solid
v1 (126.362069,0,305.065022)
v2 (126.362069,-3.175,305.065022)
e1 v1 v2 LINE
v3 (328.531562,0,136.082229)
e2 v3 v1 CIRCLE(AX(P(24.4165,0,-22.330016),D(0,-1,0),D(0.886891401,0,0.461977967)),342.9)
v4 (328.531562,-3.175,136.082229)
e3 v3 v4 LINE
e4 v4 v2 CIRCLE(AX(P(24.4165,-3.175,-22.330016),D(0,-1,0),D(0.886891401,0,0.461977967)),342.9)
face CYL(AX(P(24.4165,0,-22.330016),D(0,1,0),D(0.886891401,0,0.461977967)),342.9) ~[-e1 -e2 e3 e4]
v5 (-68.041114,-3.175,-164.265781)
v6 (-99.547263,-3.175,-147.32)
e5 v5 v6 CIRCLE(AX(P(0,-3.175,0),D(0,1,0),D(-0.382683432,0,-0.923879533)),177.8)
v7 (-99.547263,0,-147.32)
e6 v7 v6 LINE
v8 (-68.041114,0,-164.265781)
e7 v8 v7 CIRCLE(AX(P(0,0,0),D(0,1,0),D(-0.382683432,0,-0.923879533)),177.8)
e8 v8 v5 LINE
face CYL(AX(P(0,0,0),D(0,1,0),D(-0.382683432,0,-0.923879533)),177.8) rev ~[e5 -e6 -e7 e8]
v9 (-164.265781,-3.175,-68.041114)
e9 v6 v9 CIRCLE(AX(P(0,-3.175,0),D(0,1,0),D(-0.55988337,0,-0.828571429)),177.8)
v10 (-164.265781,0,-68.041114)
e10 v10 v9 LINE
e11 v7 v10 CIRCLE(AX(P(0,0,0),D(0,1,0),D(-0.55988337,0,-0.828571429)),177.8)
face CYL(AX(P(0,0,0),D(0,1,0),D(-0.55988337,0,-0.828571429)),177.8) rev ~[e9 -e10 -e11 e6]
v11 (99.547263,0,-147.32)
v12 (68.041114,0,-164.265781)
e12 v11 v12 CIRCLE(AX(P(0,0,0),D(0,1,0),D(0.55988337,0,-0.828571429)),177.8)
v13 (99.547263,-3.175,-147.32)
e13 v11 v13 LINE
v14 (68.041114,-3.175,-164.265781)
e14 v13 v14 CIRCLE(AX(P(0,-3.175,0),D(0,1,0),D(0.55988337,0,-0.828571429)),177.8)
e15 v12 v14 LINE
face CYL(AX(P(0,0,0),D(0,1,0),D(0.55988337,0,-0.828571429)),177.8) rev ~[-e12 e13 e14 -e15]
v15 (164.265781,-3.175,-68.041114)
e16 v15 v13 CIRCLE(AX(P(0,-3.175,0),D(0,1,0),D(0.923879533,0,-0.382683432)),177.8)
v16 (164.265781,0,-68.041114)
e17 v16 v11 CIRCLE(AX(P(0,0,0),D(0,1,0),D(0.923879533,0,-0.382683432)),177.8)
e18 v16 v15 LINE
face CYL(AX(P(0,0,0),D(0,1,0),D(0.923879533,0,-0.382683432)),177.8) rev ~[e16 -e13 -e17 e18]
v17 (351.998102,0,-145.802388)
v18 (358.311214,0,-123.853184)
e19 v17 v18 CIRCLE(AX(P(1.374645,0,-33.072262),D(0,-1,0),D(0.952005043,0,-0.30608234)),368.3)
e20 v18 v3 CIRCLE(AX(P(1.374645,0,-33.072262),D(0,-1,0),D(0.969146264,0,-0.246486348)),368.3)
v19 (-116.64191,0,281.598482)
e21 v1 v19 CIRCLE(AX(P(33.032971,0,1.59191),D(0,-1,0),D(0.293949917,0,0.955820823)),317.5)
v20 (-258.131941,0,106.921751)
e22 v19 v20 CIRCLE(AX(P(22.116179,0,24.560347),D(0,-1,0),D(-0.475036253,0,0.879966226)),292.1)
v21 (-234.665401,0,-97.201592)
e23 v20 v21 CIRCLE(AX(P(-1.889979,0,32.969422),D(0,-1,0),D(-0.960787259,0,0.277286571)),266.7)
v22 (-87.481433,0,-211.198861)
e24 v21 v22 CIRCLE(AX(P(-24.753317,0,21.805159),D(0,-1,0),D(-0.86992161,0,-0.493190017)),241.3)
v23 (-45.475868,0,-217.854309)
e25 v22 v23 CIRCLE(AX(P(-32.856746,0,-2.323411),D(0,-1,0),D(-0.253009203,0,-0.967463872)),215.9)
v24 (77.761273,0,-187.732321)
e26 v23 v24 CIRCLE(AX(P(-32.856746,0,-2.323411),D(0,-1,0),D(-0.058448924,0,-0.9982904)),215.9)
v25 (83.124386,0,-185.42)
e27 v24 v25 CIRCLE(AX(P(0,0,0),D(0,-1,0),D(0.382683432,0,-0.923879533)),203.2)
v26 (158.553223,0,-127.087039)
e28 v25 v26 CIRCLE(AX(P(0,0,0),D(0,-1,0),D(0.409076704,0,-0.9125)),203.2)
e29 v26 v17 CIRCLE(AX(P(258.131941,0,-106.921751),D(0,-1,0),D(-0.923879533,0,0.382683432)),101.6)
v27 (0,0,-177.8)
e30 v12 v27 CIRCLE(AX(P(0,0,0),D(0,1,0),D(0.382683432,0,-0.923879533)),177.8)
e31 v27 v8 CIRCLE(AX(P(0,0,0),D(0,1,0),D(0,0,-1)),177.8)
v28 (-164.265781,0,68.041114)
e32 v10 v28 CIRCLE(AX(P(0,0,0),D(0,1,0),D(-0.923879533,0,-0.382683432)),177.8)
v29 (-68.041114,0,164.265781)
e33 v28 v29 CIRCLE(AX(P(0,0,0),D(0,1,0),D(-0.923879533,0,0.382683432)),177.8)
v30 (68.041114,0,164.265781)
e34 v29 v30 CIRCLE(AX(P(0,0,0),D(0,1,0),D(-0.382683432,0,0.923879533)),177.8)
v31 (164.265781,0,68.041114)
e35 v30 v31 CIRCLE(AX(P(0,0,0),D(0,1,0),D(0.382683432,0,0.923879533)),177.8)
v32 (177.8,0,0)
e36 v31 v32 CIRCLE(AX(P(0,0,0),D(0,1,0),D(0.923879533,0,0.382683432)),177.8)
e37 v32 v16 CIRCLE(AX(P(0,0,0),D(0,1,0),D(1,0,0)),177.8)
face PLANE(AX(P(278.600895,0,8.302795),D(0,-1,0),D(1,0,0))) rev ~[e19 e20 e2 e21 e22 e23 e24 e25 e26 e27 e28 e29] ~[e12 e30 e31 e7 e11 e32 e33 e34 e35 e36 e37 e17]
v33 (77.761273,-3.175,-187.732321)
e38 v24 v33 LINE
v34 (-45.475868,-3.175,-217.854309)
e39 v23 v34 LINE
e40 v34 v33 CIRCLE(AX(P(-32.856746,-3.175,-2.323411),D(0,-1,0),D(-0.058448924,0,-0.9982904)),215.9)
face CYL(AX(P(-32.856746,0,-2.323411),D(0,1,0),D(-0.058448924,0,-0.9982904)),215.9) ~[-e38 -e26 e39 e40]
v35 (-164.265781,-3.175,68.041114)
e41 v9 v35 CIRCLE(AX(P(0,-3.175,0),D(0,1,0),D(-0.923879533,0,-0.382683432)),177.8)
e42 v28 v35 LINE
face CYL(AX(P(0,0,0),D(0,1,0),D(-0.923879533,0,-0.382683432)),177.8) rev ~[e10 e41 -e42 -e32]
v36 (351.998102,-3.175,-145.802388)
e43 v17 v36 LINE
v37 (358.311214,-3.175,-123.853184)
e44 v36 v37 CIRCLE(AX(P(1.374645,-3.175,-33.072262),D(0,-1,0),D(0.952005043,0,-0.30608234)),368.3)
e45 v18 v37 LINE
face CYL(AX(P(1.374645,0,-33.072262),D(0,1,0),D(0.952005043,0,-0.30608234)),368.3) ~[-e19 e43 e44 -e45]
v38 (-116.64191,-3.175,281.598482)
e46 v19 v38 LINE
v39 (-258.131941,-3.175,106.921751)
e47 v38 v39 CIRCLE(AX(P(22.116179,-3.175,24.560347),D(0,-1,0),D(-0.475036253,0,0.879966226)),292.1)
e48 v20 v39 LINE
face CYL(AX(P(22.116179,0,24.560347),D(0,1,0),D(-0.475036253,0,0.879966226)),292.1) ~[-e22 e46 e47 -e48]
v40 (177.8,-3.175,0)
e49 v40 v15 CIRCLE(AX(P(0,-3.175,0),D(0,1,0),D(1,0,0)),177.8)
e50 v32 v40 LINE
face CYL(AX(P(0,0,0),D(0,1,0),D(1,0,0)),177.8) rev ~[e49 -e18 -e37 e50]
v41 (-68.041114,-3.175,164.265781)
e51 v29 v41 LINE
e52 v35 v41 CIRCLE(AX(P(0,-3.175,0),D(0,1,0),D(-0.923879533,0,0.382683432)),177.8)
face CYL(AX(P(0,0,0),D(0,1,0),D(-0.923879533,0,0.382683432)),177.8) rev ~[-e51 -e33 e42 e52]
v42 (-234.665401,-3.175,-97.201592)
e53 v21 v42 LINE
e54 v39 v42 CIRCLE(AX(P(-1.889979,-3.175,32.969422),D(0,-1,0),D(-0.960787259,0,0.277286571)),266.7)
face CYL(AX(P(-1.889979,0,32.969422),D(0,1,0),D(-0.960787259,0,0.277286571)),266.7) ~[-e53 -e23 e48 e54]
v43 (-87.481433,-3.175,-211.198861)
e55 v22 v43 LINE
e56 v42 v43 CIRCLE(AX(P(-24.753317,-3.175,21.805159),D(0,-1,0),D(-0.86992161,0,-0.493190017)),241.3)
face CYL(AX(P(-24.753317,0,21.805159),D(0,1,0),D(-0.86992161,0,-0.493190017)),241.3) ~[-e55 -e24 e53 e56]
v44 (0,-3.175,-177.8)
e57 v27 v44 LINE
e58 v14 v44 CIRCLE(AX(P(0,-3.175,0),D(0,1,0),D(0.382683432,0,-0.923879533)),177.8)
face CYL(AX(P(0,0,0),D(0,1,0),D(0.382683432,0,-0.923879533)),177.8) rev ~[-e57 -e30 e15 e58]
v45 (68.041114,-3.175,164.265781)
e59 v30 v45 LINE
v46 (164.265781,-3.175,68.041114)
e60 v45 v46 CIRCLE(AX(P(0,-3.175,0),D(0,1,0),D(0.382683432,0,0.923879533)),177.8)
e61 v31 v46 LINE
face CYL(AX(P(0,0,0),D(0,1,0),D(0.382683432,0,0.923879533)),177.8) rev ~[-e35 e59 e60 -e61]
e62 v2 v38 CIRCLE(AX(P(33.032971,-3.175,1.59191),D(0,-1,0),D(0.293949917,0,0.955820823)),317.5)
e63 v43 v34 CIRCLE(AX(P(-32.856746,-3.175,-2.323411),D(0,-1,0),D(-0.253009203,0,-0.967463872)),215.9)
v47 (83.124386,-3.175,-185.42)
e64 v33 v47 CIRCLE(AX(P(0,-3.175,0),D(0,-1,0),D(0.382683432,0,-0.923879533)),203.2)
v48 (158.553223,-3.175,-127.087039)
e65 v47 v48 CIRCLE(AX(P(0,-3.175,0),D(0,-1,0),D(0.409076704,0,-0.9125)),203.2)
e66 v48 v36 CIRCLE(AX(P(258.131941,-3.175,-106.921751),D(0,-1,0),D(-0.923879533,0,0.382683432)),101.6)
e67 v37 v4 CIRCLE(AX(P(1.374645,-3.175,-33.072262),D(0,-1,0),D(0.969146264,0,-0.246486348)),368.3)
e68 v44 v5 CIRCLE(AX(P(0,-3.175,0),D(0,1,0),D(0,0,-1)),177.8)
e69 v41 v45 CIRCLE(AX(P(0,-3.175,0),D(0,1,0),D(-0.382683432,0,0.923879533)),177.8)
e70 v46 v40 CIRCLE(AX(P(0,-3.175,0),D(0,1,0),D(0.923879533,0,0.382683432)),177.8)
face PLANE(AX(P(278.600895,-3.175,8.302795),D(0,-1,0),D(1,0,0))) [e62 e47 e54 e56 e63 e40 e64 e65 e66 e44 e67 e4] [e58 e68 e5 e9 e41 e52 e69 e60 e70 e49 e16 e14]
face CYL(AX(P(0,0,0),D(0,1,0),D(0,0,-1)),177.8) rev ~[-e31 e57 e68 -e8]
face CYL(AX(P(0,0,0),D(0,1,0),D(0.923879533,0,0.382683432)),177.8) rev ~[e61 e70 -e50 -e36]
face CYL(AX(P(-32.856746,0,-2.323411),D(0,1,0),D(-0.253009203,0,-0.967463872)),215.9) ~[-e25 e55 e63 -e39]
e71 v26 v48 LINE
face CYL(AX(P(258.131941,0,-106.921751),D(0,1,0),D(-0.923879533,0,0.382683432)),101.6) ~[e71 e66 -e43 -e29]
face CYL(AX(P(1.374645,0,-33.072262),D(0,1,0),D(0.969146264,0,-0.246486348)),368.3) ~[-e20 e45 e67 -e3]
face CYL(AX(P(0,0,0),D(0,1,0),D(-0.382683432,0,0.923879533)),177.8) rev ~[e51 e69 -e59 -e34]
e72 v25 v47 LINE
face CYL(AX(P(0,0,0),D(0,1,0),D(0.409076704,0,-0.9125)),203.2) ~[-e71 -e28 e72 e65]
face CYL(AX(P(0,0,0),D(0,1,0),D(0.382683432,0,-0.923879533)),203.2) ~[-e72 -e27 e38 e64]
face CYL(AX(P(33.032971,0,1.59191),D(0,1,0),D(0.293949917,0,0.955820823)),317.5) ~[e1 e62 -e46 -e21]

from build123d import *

# Parameters (mm, degrees)
F1_DEPTH = 3.175


with BuildPart() as f1:
    # F0 (on Front) → F1 (new body)
    with BuildSketch(Plane.XZ):
        with BuildLine():
            ThreePointArc((164.2657808805, 68.0411142745), (174.3836228557, 34.6870592545), (177.8, 0))
            ThreePointArc((177.8, 0), (174.3836228557, -34.6870592545), (164.2657808805, -68.0411142745))
            ThreePointArc((164.2657808805, -68.0411142745), (277.9531181005, -7.2739665138), (359.7319413837, -106.9217510028))
            ThreePointArc((359.7319413837, -106.9217510028), (359.3761364248, -115.4172186461), (358.3112136183, -123.8531837399))
            ThreePointArc((358.3112136183, -123.8531837399), (367.281161492, 8.8480312827), (328.531561761, 136.082228549))
            Line((328.531561761, 136.082228549), (164.2657808805, 68.0411142745))
        make_face()
        with BuildLine():
            ThreePointArc((68.0411142745, 164.2657808805), (125.723585695, 125.723585695), (164.2657808805, 68.0411142745))
            Line((164.2657808805, 68.0411142745), (328.531561761, 136.082228549))
            ThreePointArc((328.531561761, 136.082228549), (244.3258111618, 240.7675034736), (126.362069367, 305.0650216352))
            Line((126.362069367, 305.0650216352), (68.0411142745, 164.2657808805))
        make_face()
        with BuildLine():
            ThreePointArc((158.5532229762, -127.0870390081), (157.0041232469, -97.1378663495), (164.2657808805, -68.0411142745))
            ThreePointArc((164.2657808805, -68.0411142745), (137.7338592366, -112.4376450296), (99.5472631467, -147.32))
            ThreePointArc((99.5472631467, -147.32), (93.3013149914, -167.2172179653), (83.1243863135, -185.42))
            ThreePointArc((83.1243863135, -185.42), (124.3088906415, -160.740597571), (158.5532229762, -127.0870390081))
        make_face()
        with BuildLine():
            ThreePointArc((359.7319413837, -106.9217510028), (277.9531181005, -7.2739665138), (164.2657808805, -68.0411142745))
            Line((164.2657808805, -68.0411142745), (258.1319413837, -106.9217510028))
            Line((258.1319413837, -106.9217510028), (351.9981018868, -145.8023877311))
            ThreePointArc((351.9981018868, -145.8023877311), (355.3248382646, -134.8767336877), (358.3112136183, -123.8531837399))
            ThreePointArc((358.3112136183, -123.8531837399), (359.3761364248, -115.4172186461), (359.7319413837, -106.9217510028))
        make_face()
        with BuildLine():
            Line((258.1319413837, -106.9217510028), (164.2657808805, -68.0411142745))
            ThreePointArc((164.2657808805, -68.0411142745), (157.0041232469, -97.1378663495), (158.5532229762, -127.0870390081))
            ThreePointArc((158.5532229762, -127.0870390081), (248.3480567304, -208.0495691395), (351.9981018868, -145.8023877311))
            Line((351.9981018868, -145.8023877311), (258.1319413837, -106.9217510028))
        make_face()
        with BuildLine():
            ThreePointArc((-68.0411142745, 164.2657808805), (0, 177.8), (68.0411142745, 164.2657808805))
            Line((68.0411142745, 164.2657808805), (126.362069367, 305.0650216352))
            ThreePointArc((126.362069367, 305.0650216352), (2.514428483, 317.6217641107), (-116.6419101849, 281.5984815094))
            Line((-116.6419101849, 281.5984815094), (-68.0411142745, 164.2657808805))
        make_face()
        with BuildLine():
            ThreePointArc((83.1243863135, -185.42), (93.3013149914, -167.2172179653), (99.5472631467, -147.32))
            ThreePointArc((99.5472631467, -147.32), (84.2214695555, -156.5873049322), (68.0411142745, -164.2657808805))
            Line((68.0411142745, -164.2657808805), (77.7612734566, -187.7323210063))
            ThreePointArc((77.7612734566, -187.7323210063), (80.4511378852, -186.5954297752), (83.1243863135, -185.42))
        make_face()
        with BuildLine():
            ThreePointArc((-164.2657808805, 68.0411142745), (-125.723585695, 125.723585695), (-68.0411142745, 164.2657808805))
            Line((-68.0411142745, 164.2657808805), (-116.6419101849, 281.5984815094))
            ThreePointArc((-116.6419101849, 281.5984815094), (-204.8629851326, 208.4159123673), (-258.1319413837, 106.9217510028))
            Line((-258.1319413837, 106.9217510028), (-164.2657808805, 68.0411142745))
        make_face()
        with BuildLine():
            ThreePointArc((-164.2657808805, -68.0411142745), (-177.8, 0), (-164.2657808805, 68.0411142745))
            Line((-164.2657808805, 68.0411142745), (-258.1319413837, 106.9217510028))
            ThreePointArc((-258.1319413837, 106.9217510028), (-266.8448532831, 2.5095343628), (-234.6654012579, -97.2015918207))
            Line((-234.6654012579, -97.2015918207), (-164.2657808805, -68.0411142745))
        make_face()
        with BuildLine():
            ThreePointArc((-99.5472631467, -147.32), (-137.7338592366, -112.4376450296), (-164.2657808805, -68.0411142745))
            Line((-164.2657808805, -68.0411142745), (-234.6654012579, -97.2015918207))
            ThreePointArc((-234.6654012579, -97.2015918207), (-172.5099209033, -168.9661068295), (-87.4814326387, -211.1988611321))
            Line((-87.4814326387, -211.1988611321), (-79.0449703485, -190.8314394527))
            ThreePointArc((-79.0449703485, -190.8314394527), (-91.908148752, -170.3064913493), (-99.5472631467, -147.32))
        make_face()
        with BuildLine():
            Line((77.7612734566, -187.7323210063), (68.0411142745, -164.2657808805))
            ThreePointArc((68.0411142745, -164.2657808805), (34.6870592545, -174.3836228557), (0, -177.8))
            ThreePointArc((0, -177.8), (-34.6870592545, -174.3836228557), (-68.0411142745, -164.2657808805))
            Line((-68.0411142745, -164.2657808805), (-79.0449703485, -190.8314394527))
            ThreePointArc((-79.0449703485, -190.8314394527), (-63.7096435601, -206.143169746), (-45.4758683551, -217.8543086339))
            ThreePointArc((-45.4758683551, -217.8543086339), (18.4051257388, -212.0494957439), (77.7612734566, -187.7323210063))
        make_face()
        with BuildLine():
            ThreePointArc((-68.0411142745, -164.2657808805), (-84.2214695555, -156.5873049322), (-99.5472631467, -147.32))
            ThreePointArc((-99.5472631467, -147.32), (-91.908148752, -170.3064913493), (-79.0449703485, -190.8314394527))
            Line((-79.0449703485, -190.8314394527), (-68.0411142745, -164.2657808805))
        make_face()
        with BuildLine():
            ThreePointArc((-87.4814326387, -211.1988611321), (-66.6429296743, -215.563425688), (-45.4758683551, -217.8543086339))
            ThreePointArc((-45.4758683551, -217.8543086339), (-63.7096435601, -206.143169746), (-79.0449703485, -190.8314394527))
            Line((-79.0449703485, -190.8314394527), (-87.4814326387, -211.1988611321))
        make_face()
    extrude(amount=F1_DEPTH)


solid = f1.part
